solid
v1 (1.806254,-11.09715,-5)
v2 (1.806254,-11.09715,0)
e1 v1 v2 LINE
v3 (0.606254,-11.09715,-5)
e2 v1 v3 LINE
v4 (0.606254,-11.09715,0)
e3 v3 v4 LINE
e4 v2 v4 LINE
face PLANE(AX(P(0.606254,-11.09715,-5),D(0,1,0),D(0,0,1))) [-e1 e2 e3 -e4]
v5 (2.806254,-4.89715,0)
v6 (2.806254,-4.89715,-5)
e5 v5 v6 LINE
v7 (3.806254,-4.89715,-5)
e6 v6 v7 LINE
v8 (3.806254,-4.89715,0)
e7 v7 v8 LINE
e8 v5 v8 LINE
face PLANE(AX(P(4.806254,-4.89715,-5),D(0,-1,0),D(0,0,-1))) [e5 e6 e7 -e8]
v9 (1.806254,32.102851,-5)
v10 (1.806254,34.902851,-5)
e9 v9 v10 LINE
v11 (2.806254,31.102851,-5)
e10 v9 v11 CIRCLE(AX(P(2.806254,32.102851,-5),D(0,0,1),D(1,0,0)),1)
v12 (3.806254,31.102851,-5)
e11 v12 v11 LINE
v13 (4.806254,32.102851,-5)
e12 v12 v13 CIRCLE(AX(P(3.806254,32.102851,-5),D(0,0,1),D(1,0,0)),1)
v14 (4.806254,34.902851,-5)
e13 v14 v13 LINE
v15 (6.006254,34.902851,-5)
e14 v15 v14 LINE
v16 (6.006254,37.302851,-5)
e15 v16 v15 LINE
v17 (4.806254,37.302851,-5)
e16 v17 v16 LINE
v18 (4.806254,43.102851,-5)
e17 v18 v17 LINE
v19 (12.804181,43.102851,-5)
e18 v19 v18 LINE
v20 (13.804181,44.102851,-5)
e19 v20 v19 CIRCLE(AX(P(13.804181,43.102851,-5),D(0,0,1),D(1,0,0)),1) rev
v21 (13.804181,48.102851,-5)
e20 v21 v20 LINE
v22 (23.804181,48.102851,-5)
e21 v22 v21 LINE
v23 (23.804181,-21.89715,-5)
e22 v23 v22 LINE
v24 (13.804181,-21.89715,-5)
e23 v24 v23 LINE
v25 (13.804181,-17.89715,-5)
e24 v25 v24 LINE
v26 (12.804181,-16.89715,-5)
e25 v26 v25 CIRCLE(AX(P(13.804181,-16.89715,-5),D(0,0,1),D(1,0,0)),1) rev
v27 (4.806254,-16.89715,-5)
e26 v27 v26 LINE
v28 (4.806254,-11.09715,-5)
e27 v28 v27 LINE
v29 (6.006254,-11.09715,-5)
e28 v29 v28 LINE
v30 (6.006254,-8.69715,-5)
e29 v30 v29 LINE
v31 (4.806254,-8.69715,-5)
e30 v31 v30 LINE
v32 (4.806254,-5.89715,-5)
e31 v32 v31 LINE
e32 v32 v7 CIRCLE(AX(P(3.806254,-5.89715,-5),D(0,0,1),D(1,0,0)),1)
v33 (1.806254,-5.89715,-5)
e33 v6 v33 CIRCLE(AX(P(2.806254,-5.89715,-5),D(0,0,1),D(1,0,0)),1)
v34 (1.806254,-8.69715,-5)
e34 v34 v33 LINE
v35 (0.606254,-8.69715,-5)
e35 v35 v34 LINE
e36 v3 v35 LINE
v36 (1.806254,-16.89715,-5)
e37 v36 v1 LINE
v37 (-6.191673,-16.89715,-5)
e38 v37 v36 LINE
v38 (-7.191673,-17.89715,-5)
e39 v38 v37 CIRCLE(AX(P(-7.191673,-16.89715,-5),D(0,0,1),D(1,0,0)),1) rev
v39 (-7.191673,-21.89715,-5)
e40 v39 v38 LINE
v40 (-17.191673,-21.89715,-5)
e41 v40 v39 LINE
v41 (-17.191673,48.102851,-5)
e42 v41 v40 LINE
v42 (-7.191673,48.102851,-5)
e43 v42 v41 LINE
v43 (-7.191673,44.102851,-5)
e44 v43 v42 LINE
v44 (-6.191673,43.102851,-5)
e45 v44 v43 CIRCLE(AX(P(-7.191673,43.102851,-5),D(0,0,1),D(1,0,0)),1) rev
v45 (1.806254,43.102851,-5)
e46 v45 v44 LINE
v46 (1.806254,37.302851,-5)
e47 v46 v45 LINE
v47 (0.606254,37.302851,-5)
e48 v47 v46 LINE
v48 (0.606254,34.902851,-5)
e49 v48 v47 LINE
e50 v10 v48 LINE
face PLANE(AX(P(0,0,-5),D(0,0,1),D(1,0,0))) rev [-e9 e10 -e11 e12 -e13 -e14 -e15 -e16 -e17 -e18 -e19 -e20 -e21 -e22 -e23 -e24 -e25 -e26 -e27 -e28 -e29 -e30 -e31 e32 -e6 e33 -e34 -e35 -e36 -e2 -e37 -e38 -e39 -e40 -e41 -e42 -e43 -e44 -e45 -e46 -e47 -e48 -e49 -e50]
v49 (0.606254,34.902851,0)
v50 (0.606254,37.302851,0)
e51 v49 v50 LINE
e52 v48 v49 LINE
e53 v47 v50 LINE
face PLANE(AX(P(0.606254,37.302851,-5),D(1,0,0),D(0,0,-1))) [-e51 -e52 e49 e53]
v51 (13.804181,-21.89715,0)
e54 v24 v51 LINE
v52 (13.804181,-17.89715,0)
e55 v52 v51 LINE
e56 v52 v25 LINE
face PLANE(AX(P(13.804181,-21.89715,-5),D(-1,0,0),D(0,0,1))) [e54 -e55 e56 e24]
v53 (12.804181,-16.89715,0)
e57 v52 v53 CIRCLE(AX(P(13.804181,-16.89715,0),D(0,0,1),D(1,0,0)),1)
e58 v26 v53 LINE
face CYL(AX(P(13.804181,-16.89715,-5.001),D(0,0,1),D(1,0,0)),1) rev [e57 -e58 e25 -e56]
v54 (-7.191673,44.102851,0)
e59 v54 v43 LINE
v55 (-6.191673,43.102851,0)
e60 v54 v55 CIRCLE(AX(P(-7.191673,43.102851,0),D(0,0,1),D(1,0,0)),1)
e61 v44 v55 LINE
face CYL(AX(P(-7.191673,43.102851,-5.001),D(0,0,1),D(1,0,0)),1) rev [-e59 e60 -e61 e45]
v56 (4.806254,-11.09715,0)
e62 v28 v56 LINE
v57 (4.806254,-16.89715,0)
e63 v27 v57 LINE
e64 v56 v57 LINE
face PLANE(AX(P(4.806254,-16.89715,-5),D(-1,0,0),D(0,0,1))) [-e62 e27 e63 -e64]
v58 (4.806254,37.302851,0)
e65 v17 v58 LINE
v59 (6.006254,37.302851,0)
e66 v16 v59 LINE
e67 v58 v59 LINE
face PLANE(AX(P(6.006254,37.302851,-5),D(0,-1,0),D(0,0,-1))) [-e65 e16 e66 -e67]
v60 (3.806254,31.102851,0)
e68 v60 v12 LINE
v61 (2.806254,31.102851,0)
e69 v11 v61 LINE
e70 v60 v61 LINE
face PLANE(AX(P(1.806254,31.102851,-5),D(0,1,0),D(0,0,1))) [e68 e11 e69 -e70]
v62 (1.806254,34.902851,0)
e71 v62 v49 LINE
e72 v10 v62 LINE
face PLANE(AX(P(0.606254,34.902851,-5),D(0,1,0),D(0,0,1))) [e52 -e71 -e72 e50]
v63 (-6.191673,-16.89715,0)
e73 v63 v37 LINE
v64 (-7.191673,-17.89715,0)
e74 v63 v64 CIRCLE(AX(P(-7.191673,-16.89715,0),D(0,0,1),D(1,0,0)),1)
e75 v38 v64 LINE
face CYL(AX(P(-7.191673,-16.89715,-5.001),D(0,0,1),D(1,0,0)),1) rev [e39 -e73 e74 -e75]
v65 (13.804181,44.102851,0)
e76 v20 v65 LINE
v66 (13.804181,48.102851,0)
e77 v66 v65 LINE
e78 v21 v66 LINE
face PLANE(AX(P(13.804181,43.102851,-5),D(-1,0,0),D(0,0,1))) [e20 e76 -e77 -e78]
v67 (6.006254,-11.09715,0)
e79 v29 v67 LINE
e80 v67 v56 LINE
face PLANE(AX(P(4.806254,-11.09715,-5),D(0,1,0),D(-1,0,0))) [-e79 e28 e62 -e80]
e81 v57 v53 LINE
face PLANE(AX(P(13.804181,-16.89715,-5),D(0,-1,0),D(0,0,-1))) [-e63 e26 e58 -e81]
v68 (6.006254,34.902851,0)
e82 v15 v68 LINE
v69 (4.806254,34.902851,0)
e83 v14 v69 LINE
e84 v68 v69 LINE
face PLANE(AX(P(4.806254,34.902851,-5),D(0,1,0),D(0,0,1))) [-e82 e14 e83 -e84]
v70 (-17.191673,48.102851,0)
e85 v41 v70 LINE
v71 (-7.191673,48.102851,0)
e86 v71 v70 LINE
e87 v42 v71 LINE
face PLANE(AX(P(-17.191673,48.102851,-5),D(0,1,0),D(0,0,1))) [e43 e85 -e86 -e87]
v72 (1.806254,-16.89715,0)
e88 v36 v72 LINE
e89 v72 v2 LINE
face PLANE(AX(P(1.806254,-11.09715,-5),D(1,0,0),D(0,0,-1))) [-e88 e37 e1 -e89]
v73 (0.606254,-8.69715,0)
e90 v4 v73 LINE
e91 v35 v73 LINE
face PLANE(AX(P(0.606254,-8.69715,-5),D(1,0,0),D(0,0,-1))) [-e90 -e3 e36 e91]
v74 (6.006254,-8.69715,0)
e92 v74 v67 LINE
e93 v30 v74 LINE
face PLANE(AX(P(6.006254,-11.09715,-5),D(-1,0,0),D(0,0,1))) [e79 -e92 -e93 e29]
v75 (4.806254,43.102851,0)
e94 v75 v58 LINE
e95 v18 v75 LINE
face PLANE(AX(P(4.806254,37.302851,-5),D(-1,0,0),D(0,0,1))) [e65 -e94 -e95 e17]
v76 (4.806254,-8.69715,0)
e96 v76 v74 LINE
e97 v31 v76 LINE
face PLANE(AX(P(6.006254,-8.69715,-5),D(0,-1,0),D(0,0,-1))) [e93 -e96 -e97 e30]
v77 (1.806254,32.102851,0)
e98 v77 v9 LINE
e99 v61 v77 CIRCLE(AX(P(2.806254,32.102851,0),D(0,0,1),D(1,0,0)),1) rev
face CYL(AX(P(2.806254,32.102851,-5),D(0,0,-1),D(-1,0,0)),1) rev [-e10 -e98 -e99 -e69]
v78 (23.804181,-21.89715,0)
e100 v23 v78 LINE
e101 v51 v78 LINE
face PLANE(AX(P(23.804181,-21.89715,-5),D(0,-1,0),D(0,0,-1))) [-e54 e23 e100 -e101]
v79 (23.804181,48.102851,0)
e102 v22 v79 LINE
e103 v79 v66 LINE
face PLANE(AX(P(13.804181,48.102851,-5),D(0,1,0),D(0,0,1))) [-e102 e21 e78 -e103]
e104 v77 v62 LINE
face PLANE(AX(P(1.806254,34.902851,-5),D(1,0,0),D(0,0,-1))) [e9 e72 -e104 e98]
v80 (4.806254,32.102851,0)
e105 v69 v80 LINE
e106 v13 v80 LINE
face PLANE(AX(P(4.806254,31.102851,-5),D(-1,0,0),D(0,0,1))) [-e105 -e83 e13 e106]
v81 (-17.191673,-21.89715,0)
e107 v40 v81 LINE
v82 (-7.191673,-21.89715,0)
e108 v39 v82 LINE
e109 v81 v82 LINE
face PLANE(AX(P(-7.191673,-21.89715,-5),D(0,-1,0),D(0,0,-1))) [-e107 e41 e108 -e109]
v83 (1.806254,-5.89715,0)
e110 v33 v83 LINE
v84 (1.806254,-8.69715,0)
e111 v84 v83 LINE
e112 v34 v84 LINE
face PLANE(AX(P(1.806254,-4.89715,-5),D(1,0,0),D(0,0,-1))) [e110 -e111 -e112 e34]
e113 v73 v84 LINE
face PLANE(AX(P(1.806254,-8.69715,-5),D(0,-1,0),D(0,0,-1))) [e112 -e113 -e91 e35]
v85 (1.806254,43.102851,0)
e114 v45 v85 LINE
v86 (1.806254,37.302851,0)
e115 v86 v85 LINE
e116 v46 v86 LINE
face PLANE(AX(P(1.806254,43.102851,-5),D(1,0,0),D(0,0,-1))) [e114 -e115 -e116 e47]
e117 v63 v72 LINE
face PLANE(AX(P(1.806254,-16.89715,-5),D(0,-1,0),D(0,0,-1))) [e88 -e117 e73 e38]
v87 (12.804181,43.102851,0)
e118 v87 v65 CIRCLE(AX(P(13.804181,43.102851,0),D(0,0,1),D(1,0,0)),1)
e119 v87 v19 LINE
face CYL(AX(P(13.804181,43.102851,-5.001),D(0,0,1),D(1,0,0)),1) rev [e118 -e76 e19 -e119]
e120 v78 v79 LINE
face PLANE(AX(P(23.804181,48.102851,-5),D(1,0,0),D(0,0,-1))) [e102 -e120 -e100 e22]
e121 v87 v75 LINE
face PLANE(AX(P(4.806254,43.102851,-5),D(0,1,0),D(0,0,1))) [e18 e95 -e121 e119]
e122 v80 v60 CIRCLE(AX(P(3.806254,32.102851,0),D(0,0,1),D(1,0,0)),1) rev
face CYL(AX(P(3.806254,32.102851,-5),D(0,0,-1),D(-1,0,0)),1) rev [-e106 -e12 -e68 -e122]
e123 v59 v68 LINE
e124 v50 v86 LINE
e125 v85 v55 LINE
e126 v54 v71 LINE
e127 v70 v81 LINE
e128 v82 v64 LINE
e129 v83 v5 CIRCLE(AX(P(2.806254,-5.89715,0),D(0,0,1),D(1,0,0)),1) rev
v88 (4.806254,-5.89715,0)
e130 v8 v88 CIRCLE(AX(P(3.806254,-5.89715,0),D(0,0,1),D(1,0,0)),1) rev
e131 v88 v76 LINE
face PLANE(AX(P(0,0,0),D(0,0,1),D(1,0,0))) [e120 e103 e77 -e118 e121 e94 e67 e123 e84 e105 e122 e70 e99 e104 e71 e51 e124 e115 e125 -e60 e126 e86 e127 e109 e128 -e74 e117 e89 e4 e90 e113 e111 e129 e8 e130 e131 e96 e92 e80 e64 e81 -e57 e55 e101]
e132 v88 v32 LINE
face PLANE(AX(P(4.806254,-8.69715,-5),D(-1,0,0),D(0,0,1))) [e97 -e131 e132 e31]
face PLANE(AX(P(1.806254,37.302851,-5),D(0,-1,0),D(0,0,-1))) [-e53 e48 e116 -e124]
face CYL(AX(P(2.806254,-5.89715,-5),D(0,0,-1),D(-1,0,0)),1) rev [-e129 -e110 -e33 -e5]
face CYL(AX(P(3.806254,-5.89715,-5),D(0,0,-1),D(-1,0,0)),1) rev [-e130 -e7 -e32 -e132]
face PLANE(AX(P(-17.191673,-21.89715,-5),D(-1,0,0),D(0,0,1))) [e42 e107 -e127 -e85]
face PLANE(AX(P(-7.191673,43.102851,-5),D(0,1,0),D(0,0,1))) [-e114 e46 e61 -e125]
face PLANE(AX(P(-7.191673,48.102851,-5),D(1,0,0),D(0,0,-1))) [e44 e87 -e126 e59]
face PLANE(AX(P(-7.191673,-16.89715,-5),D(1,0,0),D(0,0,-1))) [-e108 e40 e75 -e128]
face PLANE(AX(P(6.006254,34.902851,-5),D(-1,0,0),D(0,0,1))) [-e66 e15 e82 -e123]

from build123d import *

# Parameters (mm, degrees)
FLANGE_BASE1_DEPTH    = 5
CORTE_EXTRUS_O1_REACH = 55.903
ESBO_O2_R             = 1
QUEBRA_CANTO1_START   = -5
QUEBRA_CANTO1_DEPTH   = 5


# Read off the part's stored shape, not the designer's step: Quebra-Canto1
# Sheet-metal steps are written as plain solids
with BuildPart() as part:
    # Esboço1 → Flange-base1 (new body)
    with BuildSketch(Plane.XY):
        Polygon((-7.191672609, 43.102851176), (1.806254311, 43.102851176), (1.806254311, 37.302851176), (0.606254311, 37.302851176), (0.606254311, 34.902851176), (1.806254311, 34.902851176), (1.806254311, 31.102851176), (4.806254311, 31.102851176), (4.806254311, 34.902851176), (6.006254311, 34.902851176), (6.006254311, 37.302851176), (4.806254311, 37.302851176), (4.806254311, 43.102851176), (13.804181231, 43.102851176), (13.804181231, 48.102851176), (23.804181231, 48.102851176), (23.804181231, -21.897149822), (13.804181231, -21.897149822), (13.804181231, -16.897149822), (4.806254311, -16.897149822), (4.806254311, -11.097149822), (6.006254311, -11.097149822), (6.006254311, -8.697149822), (4.806254311, -8.697149822), (4.806254311, -4.897149822), (1.806254311, -4.897149822), (1.806254311, -8.697149822), (0.606254311, -8.697149822), (0.606254311, -11.097149822), (1.806254311, -11.097149822), (1.806254311, -16.897149822), (-7.191672609, -16.897149822), (-7.191672609, -21.897149822), (-17.191672609, -21.897149822), (-17.191672609, 48.10285125), (-7.191672609, 48.10285125), align=None)
    extrude(amount=-FLANGE_BASE1_DEPTH)

    # Esboço2 → Corte-extrusão1 (cut, up to next)
    with BuildSketch(Plane.XY, mode=Mode.PRIVATE) as corte_extrus_o1_sk1:
        with Locations((-7.191672609, 43.102851176)):
            Circle(ESBO_O2_R)
    corte_extrus_o1_tool1 = extrude(corte_extrus_o1_sk1.sketch, amount=-CORTE_EXTRUS_O1_REACH, mode=Mode.PRIVATE) & part.part
    # Esboço2 → Corte-extrusão1 (cut, up to next)
    with BuildSketch(Plane.XY, mode=Mode.PRIVATE) as corte_extrus_o1_sk2:
        with Locations((13.804181231, 43.102851176)):
            Circle(ESBO_O2_R)
    corte_extrus_o1_tool2 = extrude(corte_extrus_o1_sk2.sketch, amount=-CORTE_EXTRUS_O1_REACH, mode=Mode.PRIVATE) & part.part
    # Esboço2 → Corte-extrusão1 (cut, up to next)
    with BuildSketch(Plane.XY, mode=Mode.PRIVATE) as corte_extrus_o1_sk3:
        with Locations((13.804181231, -16.897149822)):
            Circle(ESBO_O2_R)
    corte_extrus_o1_tool3 = extrude(corte_extrus_o1_sk3.sketch, amount=-CORTE_EXTRUS_O1_REACH, mode=Mode.PRIVATE) & part.part
    # Esboço2 → Corte-extrusão1 (cut, up to next)
    with BuildSketch(Plane.XY, mode=Mode.PRIVATE) as corte_extrus_o1_sk4:
        with Locations((-7.191672609, -16.897149822)):
            Circle(ESBO_O2_R)
    corte_extrus_o1_tool4 = extrude(corte_extrus_o1_sk4.sketch, amount=-CORTE_EXTRUS_O1_REACH, mode=Mode.PRIVATE) & part.part
    add(corte_extrus_o1_tool1.solids().sort_by_distance((-7.191673, 43.102851, 0))[0], mode=Mode.SUBTRACT)
    add(corte_extrus_o1_tool2.solids().sort_by_distance((13.804181, 43.102851, 0))[0], mode=Mode.SUBTRACT)
    add(corte_extrus_o1_tool3.solids().sort_by_distance((13.804181, -16.89715, 0))[0], mode=Mode.SUBTRACT)
    add(corte_extrus_o1_tool4.solids().sort_by_distance((-7.191673, -16.89715, 0))[0], mode=Mode.SUBTRACT)

    # Quebra-Canto1 outline → Quebra-Canto1 (add)
    with BuildSketch(Plane.XY.offset(QUEBRA_CANTO1_START)):
        with BuildLine():
            Line((1.806254311, -4.897149822), (1.806254311, -5.897149822))
            ThreePointArc((1.806254311, -5.897149822), (2.09914753, -5.190043041), (2.806254311, -4.897149822))
            Line((2.806254311, -4.897149822), (1.806254311, -4.897149822))
        make_face()
        with BuildLine():
            Line((4.806254311, -4.897149822), (3.806254311, -4.897149822))
            ThreePointArc((3.806254311, -4.897149822), (4.513361092, -5.190043041), (4.806254311, -5.897149822))
            Line((4.806254311, -5.897149822), (4.806254311, -4.897149822))
        make_face()
        with BuildLine():
            Line((4.806254311, 31.102851176), (4.806254311, 32.102851176))
            ThreePointArc((4.806254311, 32.102851176), (4.513361092, 31.395744395), (3.806254311, 31.102851176))
            Line((3.806254311, 31.102851176), (4.806254311, 31.102851176))
        make_face()
        with BuildLine():
            Line((1.806254311, 31.102851176), (2.806254311, 31.102851176))
            ThreePointArc((2.806254311, 31.102851176), (2.09914753, 31.395744395), (1.806254311, 32.102851176))
            Line((1.806254311, 32.102851176), (1.806254311, 31.102851176))
        make_face()
    extrude(amount=QUEBRA_CANTO1_DEPTH)


solid = part.part
